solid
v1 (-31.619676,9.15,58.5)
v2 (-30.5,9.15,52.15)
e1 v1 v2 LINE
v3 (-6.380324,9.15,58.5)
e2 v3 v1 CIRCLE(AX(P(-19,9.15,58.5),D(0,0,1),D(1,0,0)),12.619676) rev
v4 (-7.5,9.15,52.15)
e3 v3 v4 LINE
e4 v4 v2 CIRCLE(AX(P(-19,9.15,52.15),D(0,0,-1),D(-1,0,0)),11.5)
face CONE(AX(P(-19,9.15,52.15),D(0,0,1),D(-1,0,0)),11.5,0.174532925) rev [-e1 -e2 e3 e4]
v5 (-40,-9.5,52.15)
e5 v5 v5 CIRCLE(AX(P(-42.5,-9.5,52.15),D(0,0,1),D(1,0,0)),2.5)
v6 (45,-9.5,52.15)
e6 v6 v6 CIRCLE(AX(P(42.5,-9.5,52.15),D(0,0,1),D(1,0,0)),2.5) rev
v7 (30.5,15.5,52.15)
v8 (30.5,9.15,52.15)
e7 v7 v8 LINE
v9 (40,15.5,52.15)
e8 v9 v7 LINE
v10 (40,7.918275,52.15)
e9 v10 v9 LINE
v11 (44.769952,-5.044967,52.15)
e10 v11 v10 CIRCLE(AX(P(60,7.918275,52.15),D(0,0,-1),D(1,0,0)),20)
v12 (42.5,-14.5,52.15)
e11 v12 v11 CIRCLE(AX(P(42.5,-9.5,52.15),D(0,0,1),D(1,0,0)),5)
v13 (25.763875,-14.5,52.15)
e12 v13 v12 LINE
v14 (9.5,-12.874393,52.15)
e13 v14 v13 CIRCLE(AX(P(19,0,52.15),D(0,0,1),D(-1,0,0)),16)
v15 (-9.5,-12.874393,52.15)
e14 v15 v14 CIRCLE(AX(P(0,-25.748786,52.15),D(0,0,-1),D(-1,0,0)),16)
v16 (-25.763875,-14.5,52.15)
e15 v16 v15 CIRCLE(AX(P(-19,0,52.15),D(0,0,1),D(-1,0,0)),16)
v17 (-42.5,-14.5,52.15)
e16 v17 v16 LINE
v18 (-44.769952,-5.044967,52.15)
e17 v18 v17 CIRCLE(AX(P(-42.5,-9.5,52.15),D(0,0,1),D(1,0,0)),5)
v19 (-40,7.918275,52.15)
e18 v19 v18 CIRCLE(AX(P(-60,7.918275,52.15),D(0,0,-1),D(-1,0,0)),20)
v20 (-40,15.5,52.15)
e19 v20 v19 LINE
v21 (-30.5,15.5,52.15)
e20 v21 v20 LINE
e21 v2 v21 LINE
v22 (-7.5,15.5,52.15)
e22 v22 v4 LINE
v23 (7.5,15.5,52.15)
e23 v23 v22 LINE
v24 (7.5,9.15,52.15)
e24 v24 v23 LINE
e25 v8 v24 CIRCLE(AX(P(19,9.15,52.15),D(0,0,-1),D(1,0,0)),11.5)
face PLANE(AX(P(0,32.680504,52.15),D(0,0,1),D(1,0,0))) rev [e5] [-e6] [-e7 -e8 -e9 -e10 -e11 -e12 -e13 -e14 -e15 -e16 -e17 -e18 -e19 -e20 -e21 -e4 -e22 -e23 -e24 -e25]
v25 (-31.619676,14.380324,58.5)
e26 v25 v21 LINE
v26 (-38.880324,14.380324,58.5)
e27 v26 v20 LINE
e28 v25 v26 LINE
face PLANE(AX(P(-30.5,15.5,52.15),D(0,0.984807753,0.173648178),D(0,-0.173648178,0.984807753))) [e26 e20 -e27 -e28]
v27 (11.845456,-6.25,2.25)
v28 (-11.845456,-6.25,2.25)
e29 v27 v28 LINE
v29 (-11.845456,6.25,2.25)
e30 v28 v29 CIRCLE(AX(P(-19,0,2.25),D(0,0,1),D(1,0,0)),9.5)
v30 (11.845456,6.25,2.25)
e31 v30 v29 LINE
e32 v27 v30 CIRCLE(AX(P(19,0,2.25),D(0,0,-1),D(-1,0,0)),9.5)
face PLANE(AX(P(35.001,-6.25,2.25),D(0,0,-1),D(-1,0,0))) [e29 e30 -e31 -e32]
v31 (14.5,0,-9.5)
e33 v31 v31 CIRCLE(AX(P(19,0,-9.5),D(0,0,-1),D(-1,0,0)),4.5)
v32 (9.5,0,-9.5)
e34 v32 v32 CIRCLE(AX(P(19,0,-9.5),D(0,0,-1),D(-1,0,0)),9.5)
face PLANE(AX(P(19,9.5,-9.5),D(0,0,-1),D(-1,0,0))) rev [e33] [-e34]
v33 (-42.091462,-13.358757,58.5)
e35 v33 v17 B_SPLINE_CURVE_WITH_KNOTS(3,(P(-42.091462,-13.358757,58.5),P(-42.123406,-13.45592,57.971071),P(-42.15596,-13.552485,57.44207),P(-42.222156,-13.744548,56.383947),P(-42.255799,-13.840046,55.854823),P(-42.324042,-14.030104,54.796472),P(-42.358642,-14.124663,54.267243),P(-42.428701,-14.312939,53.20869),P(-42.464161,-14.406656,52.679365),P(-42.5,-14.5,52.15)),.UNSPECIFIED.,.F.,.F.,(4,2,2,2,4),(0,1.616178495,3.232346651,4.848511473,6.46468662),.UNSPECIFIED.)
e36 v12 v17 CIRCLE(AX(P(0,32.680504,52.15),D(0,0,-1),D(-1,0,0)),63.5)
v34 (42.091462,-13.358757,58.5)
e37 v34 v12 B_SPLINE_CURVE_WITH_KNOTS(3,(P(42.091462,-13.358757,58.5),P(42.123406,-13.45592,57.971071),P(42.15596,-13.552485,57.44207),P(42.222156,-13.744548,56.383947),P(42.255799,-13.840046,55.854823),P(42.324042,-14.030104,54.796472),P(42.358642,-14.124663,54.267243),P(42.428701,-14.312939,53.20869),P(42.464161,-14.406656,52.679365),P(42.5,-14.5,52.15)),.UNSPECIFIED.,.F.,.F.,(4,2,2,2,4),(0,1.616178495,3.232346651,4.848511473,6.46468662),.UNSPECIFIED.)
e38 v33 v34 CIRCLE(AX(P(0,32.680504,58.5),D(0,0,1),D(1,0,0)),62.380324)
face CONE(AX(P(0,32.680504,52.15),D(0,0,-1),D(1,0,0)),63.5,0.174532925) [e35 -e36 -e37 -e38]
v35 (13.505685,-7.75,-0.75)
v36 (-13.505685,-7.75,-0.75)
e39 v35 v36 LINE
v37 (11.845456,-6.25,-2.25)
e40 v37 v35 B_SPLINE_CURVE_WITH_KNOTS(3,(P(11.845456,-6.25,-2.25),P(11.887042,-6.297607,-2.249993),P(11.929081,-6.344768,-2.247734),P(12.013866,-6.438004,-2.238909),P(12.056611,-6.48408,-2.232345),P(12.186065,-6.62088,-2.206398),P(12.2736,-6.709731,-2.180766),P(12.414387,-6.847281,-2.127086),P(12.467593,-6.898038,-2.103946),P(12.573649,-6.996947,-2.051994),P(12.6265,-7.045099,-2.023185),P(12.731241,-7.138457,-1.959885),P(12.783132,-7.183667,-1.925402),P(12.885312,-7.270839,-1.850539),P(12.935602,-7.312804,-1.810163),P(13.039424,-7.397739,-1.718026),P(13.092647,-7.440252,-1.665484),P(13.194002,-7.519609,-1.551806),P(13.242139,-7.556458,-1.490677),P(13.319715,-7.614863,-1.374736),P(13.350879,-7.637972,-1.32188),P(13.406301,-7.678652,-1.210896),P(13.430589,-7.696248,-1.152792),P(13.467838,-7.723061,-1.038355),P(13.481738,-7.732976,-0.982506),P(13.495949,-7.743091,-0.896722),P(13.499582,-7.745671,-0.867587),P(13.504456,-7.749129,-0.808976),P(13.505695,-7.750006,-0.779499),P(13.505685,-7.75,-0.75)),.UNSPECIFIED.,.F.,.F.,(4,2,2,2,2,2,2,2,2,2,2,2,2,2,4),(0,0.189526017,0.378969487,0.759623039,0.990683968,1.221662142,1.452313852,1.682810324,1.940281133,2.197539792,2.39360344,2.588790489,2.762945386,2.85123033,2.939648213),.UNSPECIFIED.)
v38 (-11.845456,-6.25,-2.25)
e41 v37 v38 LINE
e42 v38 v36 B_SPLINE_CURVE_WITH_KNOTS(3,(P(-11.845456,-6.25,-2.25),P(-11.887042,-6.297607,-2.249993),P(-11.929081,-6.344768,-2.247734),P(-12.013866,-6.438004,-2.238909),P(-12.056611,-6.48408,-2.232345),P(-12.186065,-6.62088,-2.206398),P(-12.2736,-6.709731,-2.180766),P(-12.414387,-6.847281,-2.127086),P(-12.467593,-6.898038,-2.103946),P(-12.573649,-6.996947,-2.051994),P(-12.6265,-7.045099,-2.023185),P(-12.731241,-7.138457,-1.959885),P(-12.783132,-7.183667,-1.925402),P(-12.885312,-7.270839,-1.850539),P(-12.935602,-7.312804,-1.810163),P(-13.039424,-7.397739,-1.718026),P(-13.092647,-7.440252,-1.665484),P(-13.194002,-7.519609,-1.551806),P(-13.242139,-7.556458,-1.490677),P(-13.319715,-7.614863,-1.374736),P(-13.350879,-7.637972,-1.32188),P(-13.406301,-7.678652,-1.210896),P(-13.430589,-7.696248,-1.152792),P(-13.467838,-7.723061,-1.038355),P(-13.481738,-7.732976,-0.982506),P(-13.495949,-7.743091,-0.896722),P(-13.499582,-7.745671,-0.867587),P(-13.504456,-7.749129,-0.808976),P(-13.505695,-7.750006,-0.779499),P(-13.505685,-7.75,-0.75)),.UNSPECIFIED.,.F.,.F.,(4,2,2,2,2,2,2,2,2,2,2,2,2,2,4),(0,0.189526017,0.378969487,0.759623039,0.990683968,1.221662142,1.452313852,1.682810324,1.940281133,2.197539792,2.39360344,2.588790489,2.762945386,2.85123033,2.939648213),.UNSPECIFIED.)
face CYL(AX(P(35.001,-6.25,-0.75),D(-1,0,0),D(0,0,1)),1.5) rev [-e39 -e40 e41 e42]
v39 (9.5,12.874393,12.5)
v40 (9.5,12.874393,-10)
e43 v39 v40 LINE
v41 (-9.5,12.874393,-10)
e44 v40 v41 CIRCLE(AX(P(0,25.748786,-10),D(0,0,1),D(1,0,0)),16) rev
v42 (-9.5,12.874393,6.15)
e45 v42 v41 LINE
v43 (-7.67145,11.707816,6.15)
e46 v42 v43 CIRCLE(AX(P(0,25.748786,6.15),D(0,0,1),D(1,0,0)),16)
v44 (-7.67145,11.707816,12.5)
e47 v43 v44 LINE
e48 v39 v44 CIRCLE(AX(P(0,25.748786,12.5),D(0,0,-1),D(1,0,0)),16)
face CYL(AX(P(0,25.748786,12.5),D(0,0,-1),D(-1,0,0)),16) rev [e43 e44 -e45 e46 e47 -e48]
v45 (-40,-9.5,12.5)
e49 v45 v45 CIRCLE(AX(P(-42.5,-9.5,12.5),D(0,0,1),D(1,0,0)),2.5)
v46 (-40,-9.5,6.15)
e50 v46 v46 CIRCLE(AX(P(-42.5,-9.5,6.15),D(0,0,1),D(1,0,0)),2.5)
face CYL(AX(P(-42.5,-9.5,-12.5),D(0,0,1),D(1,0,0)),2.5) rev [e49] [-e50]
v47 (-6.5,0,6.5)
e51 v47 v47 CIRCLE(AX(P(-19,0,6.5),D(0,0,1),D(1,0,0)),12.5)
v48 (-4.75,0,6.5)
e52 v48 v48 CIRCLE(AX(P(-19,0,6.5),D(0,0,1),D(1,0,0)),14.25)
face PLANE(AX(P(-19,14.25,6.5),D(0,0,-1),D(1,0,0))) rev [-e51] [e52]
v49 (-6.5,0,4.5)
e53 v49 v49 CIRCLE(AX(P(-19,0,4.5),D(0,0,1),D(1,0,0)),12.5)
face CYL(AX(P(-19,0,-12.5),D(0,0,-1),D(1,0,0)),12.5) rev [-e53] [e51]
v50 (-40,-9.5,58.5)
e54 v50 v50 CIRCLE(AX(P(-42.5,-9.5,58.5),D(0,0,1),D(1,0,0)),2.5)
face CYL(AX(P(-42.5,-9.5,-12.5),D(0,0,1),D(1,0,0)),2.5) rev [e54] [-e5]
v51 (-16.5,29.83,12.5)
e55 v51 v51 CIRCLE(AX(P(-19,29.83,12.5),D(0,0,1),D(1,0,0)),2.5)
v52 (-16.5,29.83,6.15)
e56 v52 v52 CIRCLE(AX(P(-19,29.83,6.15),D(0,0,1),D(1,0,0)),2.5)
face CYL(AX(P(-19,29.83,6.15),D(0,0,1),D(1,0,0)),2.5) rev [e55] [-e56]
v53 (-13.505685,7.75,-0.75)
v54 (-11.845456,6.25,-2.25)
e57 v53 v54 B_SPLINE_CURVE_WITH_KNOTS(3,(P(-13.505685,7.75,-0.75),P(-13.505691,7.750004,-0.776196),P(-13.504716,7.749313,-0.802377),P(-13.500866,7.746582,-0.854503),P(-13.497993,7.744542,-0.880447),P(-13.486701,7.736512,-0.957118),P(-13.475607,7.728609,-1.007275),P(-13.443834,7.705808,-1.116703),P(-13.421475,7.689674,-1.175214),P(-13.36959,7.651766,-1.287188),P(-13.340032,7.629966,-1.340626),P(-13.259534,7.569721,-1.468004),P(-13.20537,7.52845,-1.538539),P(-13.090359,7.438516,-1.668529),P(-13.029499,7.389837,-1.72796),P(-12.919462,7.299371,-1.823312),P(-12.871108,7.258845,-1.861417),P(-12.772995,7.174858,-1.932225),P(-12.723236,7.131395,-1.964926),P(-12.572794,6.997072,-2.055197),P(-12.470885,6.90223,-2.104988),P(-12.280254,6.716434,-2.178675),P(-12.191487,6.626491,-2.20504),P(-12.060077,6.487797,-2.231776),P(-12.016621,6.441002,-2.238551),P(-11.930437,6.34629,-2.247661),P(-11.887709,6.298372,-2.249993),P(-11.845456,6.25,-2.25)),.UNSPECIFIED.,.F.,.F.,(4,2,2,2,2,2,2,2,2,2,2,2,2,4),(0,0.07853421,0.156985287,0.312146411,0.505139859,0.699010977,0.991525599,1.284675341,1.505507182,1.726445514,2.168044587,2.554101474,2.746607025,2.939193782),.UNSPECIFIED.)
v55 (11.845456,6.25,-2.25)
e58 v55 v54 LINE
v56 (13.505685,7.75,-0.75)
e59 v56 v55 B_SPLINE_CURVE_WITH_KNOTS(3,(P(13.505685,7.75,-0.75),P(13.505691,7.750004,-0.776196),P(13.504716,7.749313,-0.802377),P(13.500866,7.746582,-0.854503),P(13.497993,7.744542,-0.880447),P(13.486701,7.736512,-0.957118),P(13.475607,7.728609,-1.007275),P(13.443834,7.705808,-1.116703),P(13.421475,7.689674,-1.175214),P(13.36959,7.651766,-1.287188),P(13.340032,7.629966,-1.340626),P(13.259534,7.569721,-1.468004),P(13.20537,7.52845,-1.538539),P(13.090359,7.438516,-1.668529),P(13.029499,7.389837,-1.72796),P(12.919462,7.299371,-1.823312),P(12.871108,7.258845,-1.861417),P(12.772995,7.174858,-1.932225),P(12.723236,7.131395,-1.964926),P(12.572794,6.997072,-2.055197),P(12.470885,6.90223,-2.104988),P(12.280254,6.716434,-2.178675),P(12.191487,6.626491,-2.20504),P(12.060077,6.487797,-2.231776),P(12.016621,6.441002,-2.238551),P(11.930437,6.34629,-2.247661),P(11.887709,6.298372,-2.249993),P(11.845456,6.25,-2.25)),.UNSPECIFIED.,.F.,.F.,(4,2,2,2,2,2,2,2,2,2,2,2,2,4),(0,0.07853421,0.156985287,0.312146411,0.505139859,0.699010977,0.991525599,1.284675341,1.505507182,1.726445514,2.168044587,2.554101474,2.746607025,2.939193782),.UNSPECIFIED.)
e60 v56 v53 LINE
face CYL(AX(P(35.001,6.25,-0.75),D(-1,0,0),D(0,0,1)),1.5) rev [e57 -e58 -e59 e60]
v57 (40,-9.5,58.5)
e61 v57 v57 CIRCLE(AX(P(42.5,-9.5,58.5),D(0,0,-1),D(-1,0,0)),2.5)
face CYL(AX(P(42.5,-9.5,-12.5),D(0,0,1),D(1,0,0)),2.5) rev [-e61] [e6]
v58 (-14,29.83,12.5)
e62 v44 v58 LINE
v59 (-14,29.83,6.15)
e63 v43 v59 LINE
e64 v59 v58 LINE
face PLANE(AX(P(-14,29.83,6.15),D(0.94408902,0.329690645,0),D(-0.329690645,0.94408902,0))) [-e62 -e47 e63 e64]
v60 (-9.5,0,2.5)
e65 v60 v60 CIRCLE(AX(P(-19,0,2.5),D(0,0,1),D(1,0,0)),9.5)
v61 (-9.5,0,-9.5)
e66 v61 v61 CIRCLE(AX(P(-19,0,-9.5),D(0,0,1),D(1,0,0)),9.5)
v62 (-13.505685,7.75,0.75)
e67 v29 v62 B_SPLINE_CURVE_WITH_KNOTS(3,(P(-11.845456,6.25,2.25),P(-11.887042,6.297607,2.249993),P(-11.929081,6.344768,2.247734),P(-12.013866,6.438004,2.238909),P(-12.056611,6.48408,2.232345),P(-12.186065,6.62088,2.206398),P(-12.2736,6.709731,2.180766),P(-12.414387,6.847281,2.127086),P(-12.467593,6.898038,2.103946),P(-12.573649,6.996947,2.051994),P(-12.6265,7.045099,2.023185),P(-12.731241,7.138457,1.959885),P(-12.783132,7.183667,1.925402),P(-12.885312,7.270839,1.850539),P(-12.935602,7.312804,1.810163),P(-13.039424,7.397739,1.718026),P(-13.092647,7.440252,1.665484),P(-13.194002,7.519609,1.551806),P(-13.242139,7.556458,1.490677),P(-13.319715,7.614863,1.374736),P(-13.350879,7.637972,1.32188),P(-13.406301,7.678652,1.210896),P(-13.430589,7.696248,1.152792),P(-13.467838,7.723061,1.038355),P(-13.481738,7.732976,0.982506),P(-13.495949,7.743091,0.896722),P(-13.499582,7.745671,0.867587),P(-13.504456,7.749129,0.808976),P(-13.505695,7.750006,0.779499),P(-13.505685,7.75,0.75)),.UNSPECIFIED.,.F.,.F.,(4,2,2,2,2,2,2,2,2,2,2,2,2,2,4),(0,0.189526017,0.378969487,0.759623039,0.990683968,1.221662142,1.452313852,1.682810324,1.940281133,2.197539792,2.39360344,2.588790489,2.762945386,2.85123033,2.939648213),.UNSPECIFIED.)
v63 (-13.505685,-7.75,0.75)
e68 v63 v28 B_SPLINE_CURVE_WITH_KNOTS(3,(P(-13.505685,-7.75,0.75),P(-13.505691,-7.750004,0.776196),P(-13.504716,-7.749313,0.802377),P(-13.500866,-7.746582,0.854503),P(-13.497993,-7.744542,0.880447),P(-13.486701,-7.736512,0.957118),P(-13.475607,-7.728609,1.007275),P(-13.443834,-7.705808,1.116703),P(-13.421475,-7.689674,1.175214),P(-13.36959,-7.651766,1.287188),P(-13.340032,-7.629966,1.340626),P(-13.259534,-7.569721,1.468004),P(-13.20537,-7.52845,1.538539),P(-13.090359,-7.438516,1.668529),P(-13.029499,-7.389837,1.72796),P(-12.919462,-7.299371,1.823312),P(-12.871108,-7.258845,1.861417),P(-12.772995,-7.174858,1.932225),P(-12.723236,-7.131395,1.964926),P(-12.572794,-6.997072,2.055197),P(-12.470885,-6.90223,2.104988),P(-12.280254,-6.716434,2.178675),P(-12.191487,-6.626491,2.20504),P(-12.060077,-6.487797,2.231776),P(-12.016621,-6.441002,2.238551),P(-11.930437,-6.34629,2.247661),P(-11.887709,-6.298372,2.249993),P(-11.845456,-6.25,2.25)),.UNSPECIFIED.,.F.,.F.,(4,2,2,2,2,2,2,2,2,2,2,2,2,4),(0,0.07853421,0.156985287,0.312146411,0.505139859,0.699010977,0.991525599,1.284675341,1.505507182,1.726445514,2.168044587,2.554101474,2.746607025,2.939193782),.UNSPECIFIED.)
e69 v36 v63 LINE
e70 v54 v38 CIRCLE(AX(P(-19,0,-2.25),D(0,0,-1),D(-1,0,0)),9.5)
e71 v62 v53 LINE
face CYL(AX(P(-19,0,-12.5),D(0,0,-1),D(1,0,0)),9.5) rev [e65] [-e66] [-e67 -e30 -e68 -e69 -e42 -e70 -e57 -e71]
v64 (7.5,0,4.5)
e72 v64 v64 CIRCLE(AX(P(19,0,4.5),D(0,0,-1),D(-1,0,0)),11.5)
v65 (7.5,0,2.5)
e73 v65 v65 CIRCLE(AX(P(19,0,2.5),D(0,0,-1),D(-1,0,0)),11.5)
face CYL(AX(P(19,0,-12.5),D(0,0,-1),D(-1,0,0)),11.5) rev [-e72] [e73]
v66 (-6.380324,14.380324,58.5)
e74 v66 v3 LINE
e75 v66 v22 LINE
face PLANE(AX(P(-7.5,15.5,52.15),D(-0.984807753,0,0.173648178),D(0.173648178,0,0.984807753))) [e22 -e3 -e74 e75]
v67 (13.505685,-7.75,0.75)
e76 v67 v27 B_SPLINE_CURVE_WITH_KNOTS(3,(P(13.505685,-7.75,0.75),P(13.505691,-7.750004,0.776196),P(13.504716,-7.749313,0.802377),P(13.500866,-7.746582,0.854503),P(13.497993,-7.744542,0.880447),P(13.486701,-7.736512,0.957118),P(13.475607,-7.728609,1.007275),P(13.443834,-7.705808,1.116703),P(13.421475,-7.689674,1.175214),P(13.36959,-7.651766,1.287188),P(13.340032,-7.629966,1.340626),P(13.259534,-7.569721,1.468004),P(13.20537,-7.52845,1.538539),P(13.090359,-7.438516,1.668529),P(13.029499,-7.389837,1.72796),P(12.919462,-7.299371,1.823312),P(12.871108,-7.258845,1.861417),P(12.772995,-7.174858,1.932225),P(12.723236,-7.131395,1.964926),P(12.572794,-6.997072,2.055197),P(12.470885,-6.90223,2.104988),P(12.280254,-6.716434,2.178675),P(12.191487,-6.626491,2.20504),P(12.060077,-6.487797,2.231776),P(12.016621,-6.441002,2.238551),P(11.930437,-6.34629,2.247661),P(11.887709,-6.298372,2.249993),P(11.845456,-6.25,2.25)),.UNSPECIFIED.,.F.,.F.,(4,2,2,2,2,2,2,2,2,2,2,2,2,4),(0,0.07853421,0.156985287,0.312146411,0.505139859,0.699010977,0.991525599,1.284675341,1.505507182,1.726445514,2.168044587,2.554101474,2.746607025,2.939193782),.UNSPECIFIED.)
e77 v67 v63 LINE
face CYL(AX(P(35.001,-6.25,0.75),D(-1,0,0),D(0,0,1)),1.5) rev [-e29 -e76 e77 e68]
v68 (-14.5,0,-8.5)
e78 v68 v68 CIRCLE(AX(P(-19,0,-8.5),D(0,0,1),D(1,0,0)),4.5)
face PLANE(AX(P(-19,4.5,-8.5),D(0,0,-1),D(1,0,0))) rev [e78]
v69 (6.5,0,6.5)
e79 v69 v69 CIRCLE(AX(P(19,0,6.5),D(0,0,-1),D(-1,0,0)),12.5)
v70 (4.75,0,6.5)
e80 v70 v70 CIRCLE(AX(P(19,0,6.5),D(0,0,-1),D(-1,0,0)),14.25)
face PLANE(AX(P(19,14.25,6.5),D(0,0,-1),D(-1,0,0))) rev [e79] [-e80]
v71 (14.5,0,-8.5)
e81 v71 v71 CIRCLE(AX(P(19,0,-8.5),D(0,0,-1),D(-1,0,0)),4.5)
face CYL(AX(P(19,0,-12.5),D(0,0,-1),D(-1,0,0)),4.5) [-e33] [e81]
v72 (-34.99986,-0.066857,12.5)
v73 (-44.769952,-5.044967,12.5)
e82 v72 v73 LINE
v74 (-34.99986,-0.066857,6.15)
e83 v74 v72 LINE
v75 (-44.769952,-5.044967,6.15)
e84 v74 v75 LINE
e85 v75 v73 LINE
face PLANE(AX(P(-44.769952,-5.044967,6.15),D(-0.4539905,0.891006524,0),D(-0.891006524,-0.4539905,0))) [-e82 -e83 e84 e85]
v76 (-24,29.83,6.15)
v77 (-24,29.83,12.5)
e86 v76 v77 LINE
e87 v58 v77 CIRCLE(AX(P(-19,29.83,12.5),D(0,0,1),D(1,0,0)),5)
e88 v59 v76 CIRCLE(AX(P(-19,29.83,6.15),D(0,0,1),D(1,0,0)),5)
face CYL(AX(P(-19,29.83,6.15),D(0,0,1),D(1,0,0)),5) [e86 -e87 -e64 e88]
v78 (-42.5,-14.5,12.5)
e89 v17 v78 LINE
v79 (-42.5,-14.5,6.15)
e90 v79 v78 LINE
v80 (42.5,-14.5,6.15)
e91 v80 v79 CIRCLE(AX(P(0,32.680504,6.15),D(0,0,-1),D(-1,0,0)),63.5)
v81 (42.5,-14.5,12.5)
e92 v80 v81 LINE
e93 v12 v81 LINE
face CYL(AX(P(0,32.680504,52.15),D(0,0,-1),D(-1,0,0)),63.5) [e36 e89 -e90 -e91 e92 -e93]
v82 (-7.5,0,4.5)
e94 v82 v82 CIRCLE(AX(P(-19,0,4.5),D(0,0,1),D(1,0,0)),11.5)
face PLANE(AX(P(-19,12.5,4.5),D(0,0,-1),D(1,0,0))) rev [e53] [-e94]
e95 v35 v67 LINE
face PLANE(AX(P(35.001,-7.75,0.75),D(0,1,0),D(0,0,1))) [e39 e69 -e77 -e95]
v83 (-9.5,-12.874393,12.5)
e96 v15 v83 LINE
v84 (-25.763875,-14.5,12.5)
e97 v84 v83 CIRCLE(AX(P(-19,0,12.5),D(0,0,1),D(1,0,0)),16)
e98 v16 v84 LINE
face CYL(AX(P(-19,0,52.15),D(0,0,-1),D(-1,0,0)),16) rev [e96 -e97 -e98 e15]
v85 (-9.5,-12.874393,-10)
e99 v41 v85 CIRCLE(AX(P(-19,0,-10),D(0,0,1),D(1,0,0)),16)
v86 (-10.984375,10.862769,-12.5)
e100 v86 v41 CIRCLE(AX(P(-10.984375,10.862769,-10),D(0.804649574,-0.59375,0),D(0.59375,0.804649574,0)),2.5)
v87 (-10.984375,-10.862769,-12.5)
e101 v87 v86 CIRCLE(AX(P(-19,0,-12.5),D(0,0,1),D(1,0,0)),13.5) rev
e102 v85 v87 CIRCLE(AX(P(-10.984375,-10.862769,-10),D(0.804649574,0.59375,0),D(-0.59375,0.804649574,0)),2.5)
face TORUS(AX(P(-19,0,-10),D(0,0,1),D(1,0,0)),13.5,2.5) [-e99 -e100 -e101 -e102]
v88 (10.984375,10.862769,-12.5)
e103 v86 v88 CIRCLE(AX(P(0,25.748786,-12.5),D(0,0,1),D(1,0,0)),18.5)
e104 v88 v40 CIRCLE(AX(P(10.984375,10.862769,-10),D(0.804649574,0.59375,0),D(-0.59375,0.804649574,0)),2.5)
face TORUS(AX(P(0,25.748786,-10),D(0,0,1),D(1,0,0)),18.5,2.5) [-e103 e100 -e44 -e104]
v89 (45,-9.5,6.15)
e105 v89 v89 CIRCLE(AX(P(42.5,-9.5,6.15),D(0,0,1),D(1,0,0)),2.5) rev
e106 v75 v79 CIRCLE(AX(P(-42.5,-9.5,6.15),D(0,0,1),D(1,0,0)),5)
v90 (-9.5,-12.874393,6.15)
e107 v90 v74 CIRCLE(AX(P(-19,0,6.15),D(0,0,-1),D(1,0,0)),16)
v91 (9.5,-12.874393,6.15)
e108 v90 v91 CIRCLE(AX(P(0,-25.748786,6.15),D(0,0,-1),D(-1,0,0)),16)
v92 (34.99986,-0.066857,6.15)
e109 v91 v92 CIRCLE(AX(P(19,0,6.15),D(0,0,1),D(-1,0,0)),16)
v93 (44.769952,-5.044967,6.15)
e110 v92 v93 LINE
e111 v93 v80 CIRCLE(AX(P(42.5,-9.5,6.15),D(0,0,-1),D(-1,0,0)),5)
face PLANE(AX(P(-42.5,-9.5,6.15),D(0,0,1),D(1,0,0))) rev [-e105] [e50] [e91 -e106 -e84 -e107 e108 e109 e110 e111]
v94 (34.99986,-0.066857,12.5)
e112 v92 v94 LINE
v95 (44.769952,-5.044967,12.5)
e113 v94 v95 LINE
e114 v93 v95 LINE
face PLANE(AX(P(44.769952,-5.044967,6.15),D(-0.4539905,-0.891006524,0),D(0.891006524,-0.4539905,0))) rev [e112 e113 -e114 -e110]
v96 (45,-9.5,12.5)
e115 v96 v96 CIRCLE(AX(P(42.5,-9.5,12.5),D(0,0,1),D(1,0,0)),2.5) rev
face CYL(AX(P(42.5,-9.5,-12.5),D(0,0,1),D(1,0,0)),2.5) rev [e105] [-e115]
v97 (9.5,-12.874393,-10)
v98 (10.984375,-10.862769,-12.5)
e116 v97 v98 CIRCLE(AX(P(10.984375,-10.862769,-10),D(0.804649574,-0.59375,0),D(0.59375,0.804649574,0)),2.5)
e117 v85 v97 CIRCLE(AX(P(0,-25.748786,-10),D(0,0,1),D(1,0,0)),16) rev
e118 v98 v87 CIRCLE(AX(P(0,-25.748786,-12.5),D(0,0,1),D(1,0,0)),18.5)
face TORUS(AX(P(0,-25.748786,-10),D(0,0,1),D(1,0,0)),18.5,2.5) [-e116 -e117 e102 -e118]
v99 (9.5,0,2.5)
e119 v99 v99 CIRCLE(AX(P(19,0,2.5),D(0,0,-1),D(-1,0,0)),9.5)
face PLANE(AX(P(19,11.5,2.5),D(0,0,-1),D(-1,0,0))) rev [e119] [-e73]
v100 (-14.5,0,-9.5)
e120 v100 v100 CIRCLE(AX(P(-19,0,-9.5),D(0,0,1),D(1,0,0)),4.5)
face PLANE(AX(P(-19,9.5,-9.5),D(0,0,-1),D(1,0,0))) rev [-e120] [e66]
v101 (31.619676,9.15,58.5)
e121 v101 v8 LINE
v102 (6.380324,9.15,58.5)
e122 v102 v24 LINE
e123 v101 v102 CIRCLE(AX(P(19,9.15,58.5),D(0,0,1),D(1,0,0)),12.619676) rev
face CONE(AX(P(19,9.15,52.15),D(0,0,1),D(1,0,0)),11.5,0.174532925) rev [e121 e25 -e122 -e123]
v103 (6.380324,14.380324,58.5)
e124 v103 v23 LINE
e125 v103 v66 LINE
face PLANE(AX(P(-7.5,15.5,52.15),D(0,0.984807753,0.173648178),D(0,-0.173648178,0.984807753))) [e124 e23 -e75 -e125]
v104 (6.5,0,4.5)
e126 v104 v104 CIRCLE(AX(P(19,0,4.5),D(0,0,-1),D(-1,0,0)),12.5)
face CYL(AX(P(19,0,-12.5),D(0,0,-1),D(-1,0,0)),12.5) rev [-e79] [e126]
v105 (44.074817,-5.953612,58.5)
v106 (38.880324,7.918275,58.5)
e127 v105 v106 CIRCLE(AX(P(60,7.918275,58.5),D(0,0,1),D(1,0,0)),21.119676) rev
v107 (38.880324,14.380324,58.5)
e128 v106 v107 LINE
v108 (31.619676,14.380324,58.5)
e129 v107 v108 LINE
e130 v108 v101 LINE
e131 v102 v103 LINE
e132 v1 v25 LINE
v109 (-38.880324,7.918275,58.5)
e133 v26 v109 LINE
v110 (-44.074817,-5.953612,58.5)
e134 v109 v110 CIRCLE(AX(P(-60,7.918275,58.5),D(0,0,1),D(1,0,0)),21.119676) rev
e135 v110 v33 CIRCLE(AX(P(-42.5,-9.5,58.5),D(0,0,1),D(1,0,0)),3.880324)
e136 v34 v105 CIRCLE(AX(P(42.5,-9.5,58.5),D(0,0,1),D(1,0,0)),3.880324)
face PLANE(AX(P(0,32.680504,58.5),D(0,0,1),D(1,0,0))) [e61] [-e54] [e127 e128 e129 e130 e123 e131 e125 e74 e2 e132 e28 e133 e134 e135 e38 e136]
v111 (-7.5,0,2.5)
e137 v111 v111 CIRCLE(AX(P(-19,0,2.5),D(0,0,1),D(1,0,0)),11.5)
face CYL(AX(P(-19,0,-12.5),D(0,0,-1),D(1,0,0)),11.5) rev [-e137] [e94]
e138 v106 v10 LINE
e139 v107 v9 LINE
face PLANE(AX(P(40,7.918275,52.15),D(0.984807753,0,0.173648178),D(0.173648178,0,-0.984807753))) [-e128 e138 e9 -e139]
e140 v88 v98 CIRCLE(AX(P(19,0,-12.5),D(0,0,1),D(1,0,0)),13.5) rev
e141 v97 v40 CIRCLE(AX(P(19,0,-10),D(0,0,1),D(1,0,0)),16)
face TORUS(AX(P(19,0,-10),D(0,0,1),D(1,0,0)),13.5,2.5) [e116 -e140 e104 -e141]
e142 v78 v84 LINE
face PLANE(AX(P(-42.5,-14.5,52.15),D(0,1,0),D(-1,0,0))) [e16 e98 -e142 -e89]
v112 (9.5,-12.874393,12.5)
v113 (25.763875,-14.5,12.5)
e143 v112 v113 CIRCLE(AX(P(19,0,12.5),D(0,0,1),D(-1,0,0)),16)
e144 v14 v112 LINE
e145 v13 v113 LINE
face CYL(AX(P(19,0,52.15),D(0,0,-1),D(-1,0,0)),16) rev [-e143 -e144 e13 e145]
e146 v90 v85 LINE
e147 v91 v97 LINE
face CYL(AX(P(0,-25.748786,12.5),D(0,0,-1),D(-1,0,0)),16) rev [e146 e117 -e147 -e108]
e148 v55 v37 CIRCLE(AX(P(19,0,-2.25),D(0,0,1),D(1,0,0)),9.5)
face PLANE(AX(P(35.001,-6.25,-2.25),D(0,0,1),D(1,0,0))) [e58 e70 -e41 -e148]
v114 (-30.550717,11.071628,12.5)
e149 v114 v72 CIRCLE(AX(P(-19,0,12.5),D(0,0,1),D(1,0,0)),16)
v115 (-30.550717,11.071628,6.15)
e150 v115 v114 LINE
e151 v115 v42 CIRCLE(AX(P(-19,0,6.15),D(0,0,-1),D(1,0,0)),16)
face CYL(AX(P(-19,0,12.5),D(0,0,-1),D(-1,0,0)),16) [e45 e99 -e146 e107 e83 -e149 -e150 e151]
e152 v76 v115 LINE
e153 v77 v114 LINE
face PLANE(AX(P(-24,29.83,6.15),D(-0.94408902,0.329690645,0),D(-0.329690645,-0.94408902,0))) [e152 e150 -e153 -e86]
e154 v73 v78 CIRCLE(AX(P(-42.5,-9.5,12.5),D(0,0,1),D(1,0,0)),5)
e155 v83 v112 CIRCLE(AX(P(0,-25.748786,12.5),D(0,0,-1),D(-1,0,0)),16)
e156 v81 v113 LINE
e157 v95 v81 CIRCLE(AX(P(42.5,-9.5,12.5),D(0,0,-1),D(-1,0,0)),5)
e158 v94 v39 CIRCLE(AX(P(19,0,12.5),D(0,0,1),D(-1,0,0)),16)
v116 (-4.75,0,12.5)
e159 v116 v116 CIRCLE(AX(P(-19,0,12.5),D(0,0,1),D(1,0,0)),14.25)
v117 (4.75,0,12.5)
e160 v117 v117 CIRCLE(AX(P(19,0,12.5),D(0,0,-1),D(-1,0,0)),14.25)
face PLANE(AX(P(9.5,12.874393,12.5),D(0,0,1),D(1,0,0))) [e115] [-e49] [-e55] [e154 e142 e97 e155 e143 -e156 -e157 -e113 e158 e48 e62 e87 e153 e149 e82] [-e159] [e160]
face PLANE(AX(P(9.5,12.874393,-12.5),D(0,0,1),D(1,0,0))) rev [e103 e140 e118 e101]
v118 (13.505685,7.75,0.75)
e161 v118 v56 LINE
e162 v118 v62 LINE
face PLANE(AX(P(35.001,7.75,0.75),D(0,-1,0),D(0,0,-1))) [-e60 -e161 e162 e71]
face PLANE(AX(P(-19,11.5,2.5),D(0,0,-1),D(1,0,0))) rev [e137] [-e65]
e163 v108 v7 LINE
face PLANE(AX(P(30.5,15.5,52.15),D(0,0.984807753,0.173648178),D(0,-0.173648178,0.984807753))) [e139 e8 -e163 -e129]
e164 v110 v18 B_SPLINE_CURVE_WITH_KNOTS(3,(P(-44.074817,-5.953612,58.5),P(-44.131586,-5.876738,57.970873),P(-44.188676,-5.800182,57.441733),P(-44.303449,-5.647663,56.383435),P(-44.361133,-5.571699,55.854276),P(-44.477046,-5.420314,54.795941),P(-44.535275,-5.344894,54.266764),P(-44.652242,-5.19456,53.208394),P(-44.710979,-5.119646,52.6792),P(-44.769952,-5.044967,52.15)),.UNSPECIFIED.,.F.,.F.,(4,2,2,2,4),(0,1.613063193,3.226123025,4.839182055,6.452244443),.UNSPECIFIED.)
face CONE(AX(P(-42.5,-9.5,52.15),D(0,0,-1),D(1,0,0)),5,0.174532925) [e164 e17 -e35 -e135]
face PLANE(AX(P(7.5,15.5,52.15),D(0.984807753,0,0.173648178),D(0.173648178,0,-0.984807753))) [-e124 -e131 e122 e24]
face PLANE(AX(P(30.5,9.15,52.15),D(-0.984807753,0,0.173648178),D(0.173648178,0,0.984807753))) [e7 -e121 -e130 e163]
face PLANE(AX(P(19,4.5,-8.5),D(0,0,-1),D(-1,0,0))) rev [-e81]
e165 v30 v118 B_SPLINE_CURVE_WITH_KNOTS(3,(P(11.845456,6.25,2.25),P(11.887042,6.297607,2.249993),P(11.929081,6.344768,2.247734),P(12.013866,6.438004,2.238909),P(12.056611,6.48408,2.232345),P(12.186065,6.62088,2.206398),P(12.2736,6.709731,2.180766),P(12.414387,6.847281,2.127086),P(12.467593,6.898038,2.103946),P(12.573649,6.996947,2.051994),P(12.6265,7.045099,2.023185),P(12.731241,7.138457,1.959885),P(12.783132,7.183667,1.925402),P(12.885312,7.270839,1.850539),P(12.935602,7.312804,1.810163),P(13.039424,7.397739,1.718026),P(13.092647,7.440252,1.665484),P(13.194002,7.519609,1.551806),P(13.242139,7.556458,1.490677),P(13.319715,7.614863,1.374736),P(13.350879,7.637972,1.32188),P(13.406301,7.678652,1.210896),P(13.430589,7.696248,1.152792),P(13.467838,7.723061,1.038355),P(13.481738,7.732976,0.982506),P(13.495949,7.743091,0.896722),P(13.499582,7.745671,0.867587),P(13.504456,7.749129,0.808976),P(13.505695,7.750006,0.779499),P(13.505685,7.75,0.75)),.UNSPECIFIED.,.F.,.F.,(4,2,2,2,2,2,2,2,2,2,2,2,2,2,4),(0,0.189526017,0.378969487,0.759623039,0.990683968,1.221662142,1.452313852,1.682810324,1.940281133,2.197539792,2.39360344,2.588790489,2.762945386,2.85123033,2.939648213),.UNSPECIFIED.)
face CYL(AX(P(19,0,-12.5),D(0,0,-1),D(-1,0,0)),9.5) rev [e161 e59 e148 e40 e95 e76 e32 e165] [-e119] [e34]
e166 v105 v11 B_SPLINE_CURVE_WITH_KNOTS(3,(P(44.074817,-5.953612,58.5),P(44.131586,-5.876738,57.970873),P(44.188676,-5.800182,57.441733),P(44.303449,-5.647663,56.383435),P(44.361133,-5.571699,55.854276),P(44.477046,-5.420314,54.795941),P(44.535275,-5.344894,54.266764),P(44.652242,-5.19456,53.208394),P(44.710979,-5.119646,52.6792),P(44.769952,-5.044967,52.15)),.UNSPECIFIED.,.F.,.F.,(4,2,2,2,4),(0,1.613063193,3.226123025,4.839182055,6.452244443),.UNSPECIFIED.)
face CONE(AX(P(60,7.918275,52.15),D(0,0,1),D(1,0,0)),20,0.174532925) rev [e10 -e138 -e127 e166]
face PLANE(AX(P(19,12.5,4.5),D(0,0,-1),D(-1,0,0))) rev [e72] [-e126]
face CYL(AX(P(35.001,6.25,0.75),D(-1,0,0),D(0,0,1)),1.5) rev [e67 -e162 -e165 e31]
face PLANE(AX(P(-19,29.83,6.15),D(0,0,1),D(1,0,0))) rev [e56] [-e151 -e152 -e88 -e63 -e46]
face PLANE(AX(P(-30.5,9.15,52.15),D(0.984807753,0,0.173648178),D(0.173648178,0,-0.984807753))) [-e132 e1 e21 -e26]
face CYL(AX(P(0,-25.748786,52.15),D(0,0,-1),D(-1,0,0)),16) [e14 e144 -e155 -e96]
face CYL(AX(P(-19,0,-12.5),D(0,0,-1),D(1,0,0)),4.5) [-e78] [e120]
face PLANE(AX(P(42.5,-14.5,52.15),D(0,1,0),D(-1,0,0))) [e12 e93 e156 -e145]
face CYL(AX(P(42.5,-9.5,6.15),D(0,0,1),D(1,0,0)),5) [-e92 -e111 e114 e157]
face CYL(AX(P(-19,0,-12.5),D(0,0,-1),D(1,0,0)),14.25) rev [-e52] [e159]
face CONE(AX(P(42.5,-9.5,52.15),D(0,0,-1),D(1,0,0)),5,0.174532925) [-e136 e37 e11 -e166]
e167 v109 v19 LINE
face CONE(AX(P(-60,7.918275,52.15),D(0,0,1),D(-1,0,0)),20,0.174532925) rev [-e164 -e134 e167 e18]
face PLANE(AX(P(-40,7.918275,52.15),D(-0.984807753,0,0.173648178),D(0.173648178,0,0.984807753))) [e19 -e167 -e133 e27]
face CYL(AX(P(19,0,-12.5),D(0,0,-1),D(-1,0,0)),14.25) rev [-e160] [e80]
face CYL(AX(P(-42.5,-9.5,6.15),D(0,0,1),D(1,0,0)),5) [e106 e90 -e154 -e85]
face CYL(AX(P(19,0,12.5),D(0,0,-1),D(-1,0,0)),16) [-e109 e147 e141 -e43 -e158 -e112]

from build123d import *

# Parameters (mm, degrees)
BOSS_EXTRUDE1_DEPTH                 = 12.5
CUT_EXTRUDE1_REACH                  = 42.463
CUT_EXTRUDE1_END_RADIUS             = 9.5
CUT_EXTRUDE1_DIRECTION_2_REACH      = 42.463
CUT_EXTRUDE1_DIRECTION_2_END_RADIUS = 9.5
BOSS_EXTRUDE2_DEPTH                 = 6.35
SKETCH6_R                           = 2.5
BOSS_EXTRUDE3_DEPTH                 = 6.35
BOSS_EXTRUDE4_START                 = -46
BOSS_EXTRUDE4_DEPTH                 = 46
BOSS_EXTRUDE5_DEPTH                 = 6.35
BOSS_EXTRUDE5_DRAFT                 = 10
HOLE1_START                         = 6.15
HOLE1_OUTLINE_R                     = 2.5
HOLE1_DEPTH                         = 52.35
FILLET1_R                           = 2.5


# Read off the part's stored shape, not the designer's step: Hole1
with BuildPart() as part:
    # Sketch1 → Boss-Extrude1 (new, symmetric)
    with BuildSketch(Plane.XY):
        with BuildLine():
            ThreePointArc((-9.5, 12.87439319), (-35, 0), (-9.5, -12.87439319))
            ThreePointArc((-9.5, -12.87439319), (0, -9.748786379), (9.5, -12.87439319))
            ThreePointArc((9.5, -12.87439319), (35, 0), (9.5, 12.87439319))
            ThreePointArc((9.5, 12.87439319), (0, 9.748786379), (-9.5, 12.87439319))
        make_face()
    extrude(amount=BOSS_EXTRUDE1_DEPTH, both=True)

    # Sketch2 → Cut-Revolve1 (revolve, cut)
    with BuildSketch(Plane(origin=(19, 0, 0), x_dir=(0, 0, -1), z_dir=(1, 0, 0)), mode=Mode.PRIVATE) as cut_revolve1_sk:
        Polygon((-12.5, 0), (-12.5, 14.25), (-6.5, 14.25), (-6.5, 12.5), (-4.5, 12.5), (-4.5, 11.5), (-2.5, 11.5), (-2.5, 9.5), (9.5, 9.5), (9.5, 4.5), (8.5, 4.5), (8.5, 0), align=None)
    cut_revolve1 = revolve(cut_revolve1_sk.sketch.rotate(Axis((19, 0, -12.5), (0, 0, 1)), 90), axis=Axis((19, 0, -12.5), (0, 0, 1)), mode=Mode.SUBTRACT)

    # Mirror1: Cut-Revolve1 across plane
    add(cut_revolve1.mirror(Plane(origin=(0, 0, 0), x_dir=(0, 0, 1), z_dir=(1, 0, 0))), mode=Mode.SUBTRACT)

    # Cut-Extrude1: up to this cylinder (the profile starts outside it)
    cut_extrude1_end = Plane(origin=(19, 0, 0), z_dir=(0, 0, -1)) * Cylinder(CUT_EXTRUDE1_END_RADIUS, 104.926, mode=Mode.PRIVATE)
    # Sketch3 → Cut-Extrude1 (cut, up to the surface)
    with BuildSketch(Plane(origin=(0, 0, 0), x_dir=(0, 0, -1), z_dir=(1, 0, 0)), mode=Mode.PRIVATE) as cut_extrude1_sk1:
        with BuildLine():
            Line((-0.75, -7.75), (0.75, -7.75))
            ThreePointArc((0.75, -7.75), (1.810660172, -7.310660172), (2.25, -6.25))
            Line((2.25, -6.25), (2.25, 6.25))
            ThreePointArc((2.25, 6.25), (1.810660172, 7.310660172), (0.75, 7.75))
            Line((0.75, 7.75), (-0.75, 7.75))
            ThreePointArc((-0.75, 7.75), (-1.810660172, 7.310660172), (-2.25, 6.25))
            Line((-2.25, 6.25), (-2.25, -6.25))
            ThreePointArc((-2.25, -6.25), (-1.810660172, -7.310660172), (-0.75, -7.75))
        make_face()
    cut_extrude1_tool1 = extrude(cut_extrude1_sk1.sketch, amount=CUT_EXTRUDE1_REACH, mode=Mode.PRIVATE) - cut_extrude1_end
    add(cut_extrude1_tool1.solids().sort_by_distance((0, 0, 0))[0], mode=Mode.SUBTRACT)

    # Cut-Extrude1 direction 2: up to this cylinder (the profile starts outside it)
    cut_extrude1_direction_2_end = Plane(origin=(-19, 0, 0), z_dir=(0, 0, -1)) * Cylinder(CUT_EXTRUDE1_DIRECTION_2_END_RADIUS, 104.926, mode=Mode.PRIVATE)
    # Sketch3 → Cut-Extrude1 direction 2 (cut, up to the surface)
    with BuildSketch(Plane(origin=(0, 0, 0), x_dir=(0, 0, -1), z_dir=(1, 0, 0)), mode=Mode.PRIVATE) as cut_extrude1_direction_2_sk1:
        with BuildLine():
            Line((-0.75, -7.75), (0.75, -7.75))
            ThreePointArc((0.75, -7.75), (1.810660172, -7.310660172), (2.25, -6.25))
            Line((2.25, -6.25), (2.25, 6.25))
            ThreePointArc((2.25, 6.25), (1.810660172, 7.310660172), (0.75, 7.75))
            Line((0.75, 7.75), (-0.75, 7.75))
            ThreePointArc((-0.75, 7.75), (-1.810660172, 7.310660172), (-2.25, 6.25))
            Line((-2.25, 6.25), (-2.25, -6.25))
            ThreePointArc((-2.25, -6.25), (-1.810660172, -7.310660172), (-0.75, -7.75))
        make_face()
    cut_extrude1_direction_2_tool1 = extrude(cut_extrude1_direction_2_sk1.sketch, amount=-CUT_EXTRUDE1_DIRECTION_2_REACH, mode=Mode.PRIVATE) - cut_extrude1_direction_2_end
    add(cut_extrude1_direction_2_tool1.solids().sort_by_distance((0, 0, 0))[0], mode=Mode.SUBTRACT)

    # Sketch5 → Boss-Extrude2 (add)
    with BuildSketch(Plane.XY.offset(12.5)):
        with BuildLine():
            Line((-44.769952499, -5.044967379), (-34.999860317, -0.066856769))
            ThreePointArc((-34.999860317, -0.066856769), (-32.476862137, -8.624047016), (-25.763874629, -14.5))
            Line((-25.763874629, -14.5), (-42.5, -14.5))
            ThreePointArc((-42.5, -14.5), (-47.361849602, -10.667226819), (-44.769952499, -5.044967379))
        make_face()
    boss_extrude2 = extrude(amount=-BOSS_EXTRUDE2_DEPTH)

    # Mirror2: Boss-Extrude2 across plane
    add(boss_extrude2.mirror(Plane(origin=(0, 0, 0), x_dir=(0, 0, 1), z_dir=(1, 0, 0))))

    # Sketch6 → Boss-Extrude3 (add)
    with BuildSketch(Plane.XY.offset(12.5)):
        with BuildLine():
            Line((-24, 29.83), (-30.550716865, 11.071627699))
            ThreePointArc((-30.550716865, 11.071627699), (-20.3652292, 15.94164826), (-9.5, 12.87439319))
            ThreePointArc((-9.5, 12.87439319), (-8.605515622, 12.260083666), (-7.671449956, 11.707815773))
            Line((-7.671449956, 11.707815773), (-14, 29.83))
            ThreePointArc((-14, 29.83), (-19, 34.83), (-24, 29.83))
        make_face()
        with Locations((-19, 29.83)):
            Circle(SKETCH6_R, mode=Mode.SUBTRACT)
    extrude(amount=-BOSS_EXTRUDE3_DEPTH)

    # Sketch8 → Boss-Extrude4 (add)
    with BuildSketch(Plane(origin=(0, 0, 6.15), x_dir=(-1, 0, 0), z_dir=(0, 0, -1)).offset(BOSS_EXTRUDE4_START)):
        with BuildLine():
            Line((42.5, -14.5), (25.763874629, -14.5))
            ThreePointArc((25.763874629, -14.5), (17.40869711, -15.920670687), (9.5, -12.87439319))
            ThreePointArc((9.5, -12.87439319), (0, -9.748786379), (-9.5, -12.87439319))
            ThreePointArc((-9.5, -12.87439319), (-17.40869711, -15.920670687), (-25.763874629, -14.5))
            Line((-25.763874629, -14.5), (-42.5, -14.5))
            ThreePointArc((-42.5, -14.5), (0, -30.819495552), (42.5, -14.5))
        make_face()
    extrude(amount=BOSS_EXTRUDE4_DEPTH)


with BuildPart() as boss_extrude5_tool:
    # Sketch9 → Boss-Extrude5 (with draft: the straight prism first)
    with BuildSketch(Plane.XY.offset(52.15)):
        with BuildLine():
            Line((-7.5, 15.5), (-7.5, 9.15))
            ThreePointArc((-7.5, 9.15), (-19, -2.35), (-30.5, 9.15))
            Line((-30.5, 9.15), (-30.5, 15.5))
            Line((-30.5, 15.5), (-40, 15.5))
            Line((-40, 15.5), (-40, 7.918275005))
            ThreePointArc((-40, 7.918275005), (-41.230330983, 1.011790734), (-44.769952499, -5.044967379))
            ThreePointArc((-44.769952499, -5.044967379), (-47.361849602, -10.667226819), (-42.5, -14.5))
            ThreePointArc((-42.5, -14.5), (0, -30.819495552), (42.5, -14.5))
            ThreePointArc((42.5, -14.5), (47.361849602, -10.667226819), (44.769952499, -5.044967379))
            ThreePointArc((44.769952499, -5.044967379), (41.230330983, 1.011790734), (40, 7.918275005))
            Line((40, 7.918275005), (40, 15.5))
            Line((40, 15.5), (30.5, 15.5))
            Line((30.5, 15.5), (30.5, 9.15))
            ThreePointArc((30.5, 9.15), (19, -2.35), (7.5, 9.15))
            Line((7.5, 9.15), (7.5, 15.5))
            Line((7.5, 15.5), (-7.5, 15.5))
        make_face()
    extrude(amount=BOSS_EXTRUDE5_DEPTH)
    # Boss-Extrude5: the draft: its side faces are tilted about the plane it starts from
    boss_extrude5_sides = [boss_extrude5_tool.faces().sort_by_distance(p)[0] for p in [
        (41.230330983, 1.011790734, 55.325),
        (40, 11.709137503, 55.325),
        (35.25, 15.5, 55.325),
        (30.5, 12.325, 55.325),
        (19, -2.35, 55.325),
        (7.5, 12.325, 55.325),
        (0, 15.5, 55.325),
        (-7.5, 12.325, 55.325),
        (-19, -2.35, 55.325),
        (-30.5, 12.325, 55.325),
        (-35.25, 15.5, 55.325),
        (-40, 11.709137503, 55.325),
        (-41.230330983, 1.011790734, 55.325),
        (-47.361849602, -10.667226819, 55.325),
        (0, -30.819495552, 55.325),
        (47.361849602, -10.667226819, 55.325),
    ]]
    draft(boss_extrude5_sides, Plane.XY.offset(52.15), BOSS_EXTRUDE5_DRAFT)


with BuildPart() as part_1:
    add(part.part)

    # Boss-Extrude5: add boss_extrude5_tool
    add(boss_extrude5_tool.part)

    # Hole1 outline → Hole1 (cut)
    with BuildSketch(Plane.XY.offset(HOLE1_START)):
        with Locations((-42.5, -9.5)):
            Circle(HOLE1_OUTLINE_R)
    hole1 = extrude(amount=HOLE1_DEPTH, mode=Mode.SUBTRACT)

    # Mirror3: Hole1 across plane
    add(hole1.mirror(Plane(origin=(0, 0, 0), x_dir=(0, 0, 1), z_dir=(1, 0, 0))), mode=Mode.SUBTRACT)

    # Fillet1
    fillet1_edges = [part_1.edges().sort_by_distance(p)[0] for p in [
        (35, 0, -12.5),
        (0, -9.748786379, -12.5),
        (-35, 0, -12.5),
        (0, 9.748786379, -12.5),
    ]]
    fillet(fillet1_edges, radius=FILLET1_R)


solid = part_1.part
